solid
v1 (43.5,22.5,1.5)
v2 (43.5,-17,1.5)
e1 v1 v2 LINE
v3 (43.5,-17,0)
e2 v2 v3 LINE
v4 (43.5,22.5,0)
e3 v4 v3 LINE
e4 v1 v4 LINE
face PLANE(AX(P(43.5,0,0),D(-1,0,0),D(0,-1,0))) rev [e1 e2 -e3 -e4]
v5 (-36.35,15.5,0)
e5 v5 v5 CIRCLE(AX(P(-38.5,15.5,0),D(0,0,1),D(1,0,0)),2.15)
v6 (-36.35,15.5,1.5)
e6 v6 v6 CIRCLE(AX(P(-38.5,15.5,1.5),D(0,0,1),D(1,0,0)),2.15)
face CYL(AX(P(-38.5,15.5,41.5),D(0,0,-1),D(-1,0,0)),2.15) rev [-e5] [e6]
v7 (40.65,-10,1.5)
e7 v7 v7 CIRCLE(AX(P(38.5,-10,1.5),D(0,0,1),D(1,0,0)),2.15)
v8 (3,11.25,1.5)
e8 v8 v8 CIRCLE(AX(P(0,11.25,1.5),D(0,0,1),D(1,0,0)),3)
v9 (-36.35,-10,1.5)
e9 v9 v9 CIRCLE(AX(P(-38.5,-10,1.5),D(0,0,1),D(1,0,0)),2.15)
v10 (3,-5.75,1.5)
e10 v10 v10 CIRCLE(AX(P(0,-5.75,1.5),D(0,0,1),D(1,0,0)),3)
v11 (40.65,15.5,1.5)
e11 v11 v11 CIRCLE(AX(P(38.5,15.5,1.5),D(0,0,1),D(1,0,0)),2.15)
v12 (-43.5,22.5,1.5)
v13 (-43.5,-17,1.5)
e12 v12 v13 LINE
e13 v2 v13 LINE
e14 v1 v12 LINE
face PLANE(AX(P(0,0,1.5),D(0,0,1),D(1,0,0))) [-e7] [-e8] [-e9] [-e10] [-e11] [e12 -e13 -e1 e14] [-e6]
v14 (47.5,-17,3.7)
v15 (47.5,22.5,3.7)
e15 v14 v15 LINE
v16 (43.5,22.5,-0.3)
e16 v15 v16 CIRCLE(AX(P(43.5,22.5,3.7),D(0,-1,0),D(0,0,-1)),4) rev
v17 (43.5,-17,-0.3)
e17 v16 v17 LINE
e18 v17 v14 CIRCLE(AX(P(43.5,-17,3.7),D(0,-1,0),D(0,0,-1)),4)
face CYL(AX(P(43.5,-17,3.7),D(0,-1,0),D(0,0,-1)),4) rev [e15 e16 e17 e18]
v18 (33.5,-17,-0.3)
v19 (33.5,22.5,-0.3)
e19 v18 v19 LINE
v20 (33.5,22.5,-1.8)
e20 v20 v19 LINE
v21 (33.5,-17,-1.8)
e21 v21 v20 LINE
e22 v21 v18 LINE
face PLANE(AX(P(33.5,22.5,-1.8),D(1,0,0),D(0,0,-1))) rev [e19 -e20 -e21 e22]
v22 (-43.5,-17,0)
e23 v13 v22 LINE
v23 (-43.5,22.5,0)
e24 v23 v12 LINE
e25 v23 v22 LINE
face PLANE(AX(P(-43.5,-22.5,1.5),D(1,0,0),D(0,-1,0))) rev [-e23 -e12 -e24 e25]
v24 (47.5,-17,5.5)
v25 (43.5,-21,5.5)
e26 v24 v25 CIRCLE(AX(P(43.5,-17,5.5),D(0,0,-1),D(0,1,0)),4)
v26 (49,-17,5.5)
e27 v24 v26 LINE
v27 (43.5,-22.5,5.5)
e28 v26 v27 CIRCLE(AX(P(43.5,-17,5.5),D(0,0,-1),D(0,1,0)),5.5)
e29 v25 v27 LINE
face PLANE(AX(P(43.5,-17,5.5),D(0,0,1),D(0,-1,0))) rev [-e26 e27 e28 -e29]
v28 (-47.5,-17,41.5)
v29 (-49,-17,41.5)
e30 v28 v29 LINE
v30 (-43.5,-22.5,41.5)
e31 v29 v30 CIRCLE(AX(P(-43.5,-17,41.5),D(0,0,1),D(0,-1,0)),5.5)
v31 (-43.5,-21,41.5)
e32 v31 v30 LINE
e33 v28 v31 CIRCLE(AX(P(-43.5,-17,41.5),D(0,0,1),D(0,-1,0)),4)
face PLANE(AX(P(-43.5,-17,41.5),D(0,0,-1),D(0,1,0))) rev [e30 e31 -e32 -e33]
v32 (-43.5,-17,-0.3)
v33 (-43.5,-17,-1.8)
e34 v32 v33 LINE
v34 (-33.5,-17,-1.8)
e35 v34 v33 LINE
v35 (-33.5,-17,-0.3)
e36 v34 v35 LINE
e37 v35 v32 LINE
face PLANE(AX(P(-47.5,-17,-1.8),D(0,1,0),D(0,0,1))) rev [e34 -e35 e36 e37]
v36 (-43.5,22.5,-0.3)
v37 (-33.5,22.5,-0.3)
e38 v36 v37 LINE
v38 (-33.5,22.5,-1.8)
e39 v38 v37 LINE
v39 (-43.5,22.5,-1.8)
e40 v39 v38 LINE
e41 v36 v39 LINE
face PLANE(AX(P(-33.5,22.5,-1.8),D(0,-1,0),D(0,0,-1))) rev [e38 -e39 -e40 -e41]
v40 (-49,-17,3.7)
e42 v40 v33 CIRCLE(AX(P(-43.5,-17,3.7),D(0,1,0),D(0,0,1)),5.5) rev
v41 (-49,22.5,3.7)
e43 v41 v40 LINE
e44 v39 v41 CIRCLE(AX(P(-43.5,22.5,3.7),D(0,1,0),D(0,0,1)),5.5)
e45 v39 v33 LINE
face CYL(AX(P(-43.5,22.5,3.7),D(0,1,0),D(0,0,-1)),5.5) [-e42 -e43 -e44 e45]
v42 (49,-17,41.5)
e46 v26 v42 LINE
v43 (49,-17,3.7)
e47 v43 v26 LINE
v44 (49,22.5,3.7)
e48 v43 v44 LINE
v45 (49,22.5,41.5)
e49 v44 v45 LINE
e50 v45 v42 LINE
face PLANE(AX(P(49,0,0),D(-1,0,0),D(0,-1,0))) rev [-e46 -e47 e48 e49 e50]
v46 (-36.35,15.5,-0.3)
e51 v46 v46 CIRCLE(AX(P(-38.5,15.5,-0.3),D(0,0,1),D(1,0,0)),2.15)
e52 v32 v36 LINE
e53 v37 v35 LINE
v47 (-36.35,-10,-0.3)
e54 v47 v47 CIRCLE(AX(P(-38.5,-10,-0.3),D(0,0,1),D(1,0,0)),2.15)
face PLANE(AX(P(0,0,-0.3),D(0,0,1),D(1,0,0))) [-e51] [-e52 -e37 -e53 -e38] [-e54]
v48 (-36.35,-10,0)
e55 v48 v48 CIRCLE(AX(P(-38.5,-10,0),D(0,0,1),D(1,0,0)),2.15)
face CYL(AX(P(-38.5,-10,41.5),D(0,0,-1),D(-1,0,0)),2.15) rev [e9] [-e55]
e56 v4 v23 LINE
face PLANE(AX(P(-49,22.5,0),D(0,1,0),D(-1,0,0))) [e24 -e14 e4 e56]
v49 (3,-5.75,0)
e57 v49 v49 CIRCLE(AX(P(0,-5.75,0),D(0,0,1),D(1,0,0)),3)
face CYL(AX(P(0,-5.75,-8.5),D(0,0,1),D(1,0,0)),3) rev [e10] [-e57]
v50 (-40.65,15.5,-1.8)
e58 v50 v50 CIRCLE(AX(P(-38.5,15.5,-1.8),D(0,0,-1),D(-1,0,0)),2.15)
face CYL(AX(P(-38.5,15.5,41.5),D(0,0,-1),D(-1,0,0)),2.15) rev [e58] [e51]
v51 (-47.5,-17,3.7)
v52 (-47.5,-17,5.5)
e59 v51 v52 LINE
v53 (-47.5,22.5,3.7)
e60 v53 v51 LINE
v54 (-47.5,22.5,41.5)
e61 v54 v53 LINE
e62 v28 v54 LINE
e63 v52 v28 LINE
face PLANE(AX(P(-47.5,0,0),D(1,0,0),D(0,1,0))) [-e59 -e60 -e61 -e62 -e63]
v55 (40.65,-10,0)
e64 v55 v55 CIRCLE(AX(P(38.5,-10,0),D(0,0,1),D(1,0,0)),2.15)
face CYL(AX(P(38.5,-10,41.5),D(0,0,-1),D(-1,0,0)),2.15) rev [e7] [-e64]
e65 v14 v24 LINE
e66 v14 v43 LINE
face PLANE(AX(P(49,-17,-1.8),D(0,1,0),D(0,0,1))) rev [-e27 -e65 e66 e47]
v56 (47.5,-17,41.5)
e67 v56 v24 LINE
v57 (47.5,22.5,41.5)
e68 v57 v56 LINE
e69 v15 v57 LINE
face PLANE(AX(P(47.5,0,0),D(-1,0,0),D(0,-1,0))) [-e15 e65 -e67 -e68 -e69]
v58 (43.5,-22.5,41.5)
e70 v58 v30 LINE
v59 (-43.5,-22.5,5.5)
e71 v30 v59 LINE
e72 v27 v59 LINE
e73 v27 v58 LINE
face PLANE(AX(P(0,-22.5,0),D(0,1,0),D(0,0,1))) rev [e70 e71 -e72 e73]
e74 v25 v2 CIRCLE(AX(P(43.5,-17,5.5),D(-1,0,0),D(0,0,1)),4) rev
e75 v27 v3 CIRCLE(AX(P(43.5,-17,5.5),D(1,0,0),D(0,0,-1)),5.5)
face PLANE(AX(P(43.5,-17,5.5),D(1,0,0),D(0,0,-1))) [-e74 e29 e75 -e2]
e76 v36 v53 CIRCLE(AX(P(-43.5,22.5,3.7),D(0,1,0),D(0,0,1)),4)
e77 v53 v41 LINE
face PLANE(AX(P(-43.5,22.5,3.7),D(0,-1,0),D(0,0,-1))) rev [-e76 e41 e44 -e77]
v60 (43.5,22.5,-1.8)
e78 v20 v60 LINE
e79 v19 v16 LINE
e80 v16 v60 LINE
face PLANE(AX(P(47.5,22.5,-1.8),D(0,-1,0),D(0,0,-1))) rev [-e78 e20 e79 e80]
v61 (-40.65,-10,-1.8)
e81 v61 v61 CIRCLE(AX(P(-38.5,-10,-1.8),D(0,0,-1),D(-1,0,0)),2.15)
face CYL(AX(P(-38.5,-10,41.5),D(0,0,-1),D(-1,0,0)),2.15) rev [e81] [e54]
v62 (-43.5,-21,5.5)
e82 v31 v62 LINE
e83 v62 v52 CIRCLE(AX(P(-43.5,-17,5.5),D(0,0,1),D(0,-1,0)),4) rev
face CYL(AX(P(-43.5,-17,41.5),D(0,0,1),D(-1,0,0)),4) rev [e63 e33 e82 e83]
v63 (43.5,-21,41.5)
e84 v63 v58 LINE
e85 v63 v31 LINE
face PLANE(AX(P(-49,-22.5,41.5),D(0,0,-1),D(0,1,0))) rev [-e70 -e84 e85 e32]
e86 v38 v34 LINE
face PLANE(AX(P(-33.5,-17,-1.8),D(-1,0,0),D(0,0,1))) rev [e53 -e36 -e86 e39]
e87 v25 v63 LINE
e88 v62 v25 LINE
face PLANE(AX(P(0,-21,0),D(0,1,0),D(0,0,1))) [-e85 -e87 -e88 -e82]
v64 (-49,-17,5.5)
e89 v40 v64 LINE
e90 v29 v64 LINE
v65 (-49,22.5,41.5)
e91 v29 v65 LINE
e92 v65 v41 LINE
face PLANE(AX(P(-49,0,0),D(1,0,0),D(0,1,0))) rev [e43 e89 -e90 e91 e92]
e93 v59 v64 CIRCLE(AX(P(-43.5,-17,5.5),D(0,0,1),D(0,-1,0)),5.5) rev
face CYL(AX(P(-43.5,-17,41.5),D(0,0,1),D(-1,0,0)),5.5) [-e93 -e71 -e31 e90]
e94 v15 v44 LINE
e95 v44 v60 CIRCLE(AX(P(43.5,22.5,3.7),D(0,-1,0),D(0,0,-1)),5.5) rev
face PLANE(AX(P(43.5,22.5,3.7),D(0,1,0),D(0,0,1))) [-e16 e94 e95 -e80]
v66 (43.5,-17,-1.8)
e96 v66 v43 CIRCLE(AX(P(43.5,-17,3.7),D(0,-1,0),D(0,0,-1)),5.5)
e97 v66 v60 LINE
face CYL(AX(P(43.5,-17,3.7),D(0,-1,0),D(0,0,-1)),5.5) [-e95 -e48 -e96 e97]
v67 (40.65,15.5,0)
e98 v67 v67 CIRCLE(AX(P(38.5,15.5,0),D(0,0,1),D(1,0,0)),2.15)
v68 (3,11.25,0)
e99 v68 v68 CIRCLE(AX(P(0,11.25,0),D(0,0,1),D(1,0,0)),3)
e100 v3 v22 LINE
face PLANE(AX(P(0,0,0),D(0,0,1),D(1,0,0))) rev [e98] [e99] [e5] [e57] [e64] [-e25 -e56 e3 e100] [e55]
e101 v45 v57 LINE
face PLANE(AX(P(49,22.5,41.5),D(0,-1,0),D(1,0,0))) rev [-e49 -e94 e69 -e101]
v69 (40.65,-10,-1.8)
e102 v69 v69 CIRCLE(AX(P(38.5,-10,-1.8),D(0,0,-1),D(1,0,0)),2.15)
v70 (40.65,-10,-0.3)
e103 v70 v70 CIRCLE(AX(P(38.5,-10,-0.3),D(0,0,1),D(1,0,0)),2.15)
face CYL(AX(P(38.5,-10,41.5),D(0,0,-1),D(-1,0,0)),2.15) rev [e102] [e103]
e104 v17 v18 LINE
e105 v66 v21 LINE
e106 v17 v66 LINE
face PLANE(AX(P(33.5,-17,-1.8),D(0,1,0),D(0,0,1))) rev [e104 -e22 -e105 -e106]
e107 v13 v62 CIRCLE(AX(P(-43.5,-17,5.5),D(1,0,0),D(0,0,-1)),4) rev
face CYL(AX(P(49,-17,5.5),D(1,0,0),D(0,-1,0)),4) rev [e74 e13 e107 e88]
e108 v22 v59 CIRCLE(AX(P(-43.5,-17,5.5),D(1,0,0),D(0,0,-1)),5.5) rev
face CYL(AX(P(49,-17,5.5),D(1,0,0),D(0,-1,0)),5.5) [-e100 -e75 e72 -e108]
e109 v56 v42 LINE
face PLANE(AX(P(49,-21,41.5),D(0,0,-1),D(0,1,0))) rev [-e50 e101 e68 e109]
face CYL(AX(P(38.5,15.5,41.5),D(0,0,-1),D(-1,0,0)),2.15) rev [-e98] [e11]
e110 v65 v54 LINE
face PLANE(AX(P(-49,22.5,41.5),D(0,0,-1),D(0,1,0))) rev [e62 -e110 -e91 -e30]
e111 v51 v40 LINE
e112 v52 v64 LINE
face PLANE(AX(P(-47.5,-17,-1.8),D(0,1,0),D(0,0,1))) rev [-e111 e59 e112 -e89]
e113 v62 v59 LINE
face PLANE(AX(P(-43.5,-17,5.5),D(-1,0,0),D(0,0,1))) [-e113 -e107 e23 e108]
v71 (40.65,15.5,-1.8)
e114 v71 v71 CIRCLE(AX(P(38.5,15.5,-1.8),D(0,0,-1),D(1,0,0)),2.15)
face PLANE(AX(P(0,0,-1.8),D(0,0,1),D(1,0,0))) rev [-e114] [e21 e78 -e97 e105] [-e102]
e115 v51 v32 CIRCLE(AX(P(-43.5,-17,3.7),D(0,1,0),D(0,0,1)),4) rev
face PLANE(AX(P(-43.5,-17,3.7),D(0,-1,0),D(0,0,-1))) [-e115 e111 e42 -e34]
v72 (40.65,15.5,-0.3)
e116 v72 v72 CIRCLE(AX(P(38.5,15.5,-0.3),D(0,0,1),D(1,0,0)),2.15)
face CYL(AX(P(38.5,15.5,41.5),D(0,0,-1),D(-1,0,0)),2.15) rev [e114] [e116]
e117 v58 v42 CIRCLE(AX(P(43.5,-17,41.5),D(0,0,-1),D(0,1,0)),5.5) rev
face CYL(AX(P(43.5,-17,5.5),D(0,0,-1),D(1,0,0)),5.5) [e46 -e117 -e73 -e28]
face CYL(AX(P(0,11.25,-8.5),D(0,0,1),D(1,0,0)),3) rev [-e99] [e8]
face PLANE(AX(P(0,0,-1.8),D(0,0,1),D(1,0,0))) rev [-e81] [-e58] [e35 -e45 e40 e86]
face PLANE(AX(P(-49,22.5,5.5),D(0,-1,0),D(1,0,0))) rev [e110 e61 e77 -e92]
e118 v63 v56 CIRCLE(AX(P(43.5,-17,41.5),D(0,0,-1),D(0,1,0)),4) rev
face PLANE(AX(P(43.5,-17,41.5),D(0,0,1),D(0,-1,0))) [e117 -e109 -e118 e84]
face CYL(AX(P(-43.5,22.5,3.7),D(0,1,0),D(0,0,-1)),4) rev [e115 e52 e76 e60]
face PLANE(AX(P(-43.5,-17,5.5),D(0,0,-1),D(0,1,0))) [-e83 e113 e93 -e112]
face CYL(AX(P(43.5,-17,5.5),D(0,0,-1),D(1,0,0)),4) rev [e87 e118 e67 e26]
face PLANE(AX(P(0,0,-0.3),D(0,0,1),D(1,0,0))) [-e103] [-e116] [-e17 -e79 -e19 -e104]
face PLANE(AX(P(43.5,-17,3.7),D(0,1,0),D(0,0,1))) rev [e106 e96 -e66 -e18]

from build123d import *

# Parameters (mm, degrees)
SKETCH1_W                      = 98
SKETCH1_H                      = 45
BOSS_EXTRUDE1_DEPTH            = 10
CONVERT_SOLID1_START           = 1.5
CONVERT_SOLID1_OUTLINE_W       = 98
CONVERT_SOLID1_OUTLINE_H       = 45
CONVERT_SOLID1_DEPTH           = 8.5
EDGE_FLANGE1_STRIP_W           = 14
EDGE_FLANGE1_STRIP_H           = 1.5
EDGE_FLANGE1_STRIP_CUT_DEPTH   = 98
EDGE_FLANGE1_DEPTH             = 98
EDGE_FLANGE2_STRIP_W           = 14
EDGE_FLANGE2_STRIP_H           = 1.5
EDGE_FLANGE2_STRIP_CUT_DEPTH   = 36
EDGE_FLANGE2_STRIP_2_W         = 14
EDGE_FLANGE2_STRIP_2_H         = 1.5
EDGE_FLANGE2_STRIP_CUT_2_DEPTH = 36
EDGE_FLANGE2_DEPTH             = 36
EDGE_FLANGE2_BEND_DEPTH        = 36
SKETCH17_W                     = 5.5
SKETCH17_H                     = 5.5
CUT_EXTRUDE1_DEPTH             = 79.41077732
SKETCH18_W                     = 1.5
SKETCH18_H                     = 39.5
BOSS_EXTRUDE2_DEPTH            = 7.3
EDGE_FLANGE3_STRIP_W           = 14
EDGE_FLANGE3_STRIP_H           = 1.5
EDGE_FLANGE3_STRIP_CUT_DEPTH   = 39.5
EDGE_FLANGE3_STRIP_2_W         = 14
EDGE_FLANGE3_STRIP_2_H         = 1.5
EDGE_FLANGE3_STRIP_CUT_2_DEPTH = 39.5
EDGE_FLANGE3_DEPTH             = 39.5
EDGE_FLANGE3_BEND_DEPTH        = 39.5
SKETCH25_R                     = 2.15
CUT_EXTRUDE2_DEPTH             = 70.153018734
SKETCH26_R                     = 3
CUT_EXTRUDE3_DEPTH             = 10


# Read off the part's stored shape, not the designer's step: Convert-Solid1
# Sheet-metal steps are written as plain solids
with BuildPart() as part:
    # Sketch1 → Boss-Extrude1 (new body)
    with BuildSketch(Plane.XY):
        Rectangle(SKETCH1_W, SKETCH1_H)
    extrude(amount=BOSS_EXTRUDE1_DEPTH)

    # Convert-Solid1 outline → Convert-Solid1 (cut)
    with BuildSketch(Plane.XY.offset(CONVERT_SOLID1_START)):
        Rectangle(CONVERT_SOLID1_OUTLINE_W, CONVERT_SOLID1_OUTLINE_H)
    extrude(amount=CONVERT_SOLID1_DEPTH, mode=Mode.SUBTRACT)

    # Edge-Flange1 strip (across the edge) → Edge-Flange1 strip cut (cut)
    with BuildSketch(Plane(origin=(-49, -22.5, 1.5), x_dir=(0, 1, 0), z_dir=(1, 0, 0))):
        with Locations((-1.5, -0.75)):
            Rectangle(EDGE_FLANGE1_STRIP_W, EDGE_FLANGE1_STRIP_H)
    extrude(amount=EDGE_FLANGE1_STRIP_CUT_DEPTH, mode=Mode.SUBTRACT)

    # Edge-Flange1 section (across the edge) → Edge-Flange1 (add)
    with BuildSketch(Plane(origin=(-49, -22.5, 1.5), x_dir=(0, 1, 0), z_dir=(1, 0, 0))):
        with BuildLine():
            Line((0, 4), (0, 40))
            Line((0, 40), (1.5, 40))
            Line((1.5, 40), (1.5, 4))
            ThreePointArc((1.5, 4), (2.671572875, 1.171572875), (5.5, 0))
            Line((5.5, 0), (5.5, -1.5))
            ThreePointArc((5.5, -1.5), (1.610912703, 0.110912703), (0, 4))
        make_face()
    extrude(amount=EDGE_FLANGE1_DEPTH)

    # Edge-Flange2 strip (across the edge) → Edge-Flange2 strip cut (cut)
    with BuildSketch(Plane(origin=(49, -21, 41.5), x_dir=(-1, 0, 0), z_dir=(0, 0, -1))):
        with Locations((-1.5, -0.75)):
            Rectangle(EDGE_FLANGE2_STRIP_W, EDGE_FLANGE2_STRIP_H)
    extrude(amount=EDGE_FLANGE2_STRIP_CUT_DEPTH, mode=Mode.SUBTRACT)

    # Edge-Flange2 strip 2 (across the edge) → Edge-Flange2 strip cut 2 (cut)
    with BuildSketch(Plane(origin=(-49, -21, 5.5), x_dir=(1, 0, 0), z_dir=(0, 0, 1))):
        with Locations((-1.5, -0.75)):
            Rectangle(EDGE_FLANGE2_STRIP_2_W, EDGE_FLANGE2_STRIP_2_H)
    extrude(amount=EDGE_FLANGE2_STRIP_CUT_2_DEPTH, mode=Mode.SUBTRACT)

    # Edge-Flange2 section (across the edge) → Edge-Flange2 (add)
    with BuildSketch(Plane(origin=(49, -21, 41.5), x_dir=(-1, 0, 0), z_dir=(0, 0, -1))):
        with BuildLine():
            Line((0, 4), (0, 43.5))
            Line((0, 43.5), (1.5, 43.5))
            Line((1.5, 43.5), (1.5, 4))
            ThreePointArc((1.5, 4), (2.671572875, 1.171572875), (5.5, 0))
            Line((5.5, 0), (5.5, -1.5))
            ThreePointArc((5.5, -1.5), (1.610912703, 0.110912703), (0, 4))
        make_face()
    extrude(amount=EDGE_FLANGE2_DEPTH)

    # Edge-Flange2 section 2 (across the edge) → Edge-Flange2 bend (add)
    with BuildSketch(Plane(origin=(-49, -21, 5.5), x_dir=(1, 0, 0), z_dir=(0, 0, 1))):
        with BuildLine():
            Line((0, 4), (0, 43.5))
            Line((0, 43.5), (1.5, 43.5))
            Line((1.5, 43.5), (1.5, 4))
            ThreePointArc((1.5, 4), (2.671572875, 1.171572875), (5.5, 0))
            Line((5.5, 0), (5.5, -1.5))
            ThreePointArc((5.5, -1.5), (1.610912703, 0.110912703), (0, 4))
        make_face()
    extrude(amount=EDGE_FLANGE2_BEND_DEPTH)

    # Sketch17 → Cut-Extrude1 (cut, through all)
    with BuildSketch(Plane(origin=(0, 22.5, 0), x_dir=(1, 0, 0), z_dir=(0, 1, 0))):
        with Locations((-46.25, -2.75)):
            Rectangle(SKETCH17_W, SKETCH17_H)
        with Locations((46.25, -2.75)):
            Rectangle(SKETCH17_W, SKETCH17_H)
    extrude(amount=-CUT_EXTRUDE1_DEPTH, mode=Mode.SUBTRACT)

    # Sketch18 → Boss-Extrude2 (add)
    with BuildSketch(Plane(origin=(0, 0, 5.5), x_dir=(-1, 0, 0), z_dir=(0, 0, -1))):
        with Locations((-48.25, 2.75)):
            Rectangle(SKETCH18_W, SKETCH18_H)
        with Locations((48.25, 2.75)):
            Rectangle(SKETCH18_W, SKETCH18_H)
    extrude(amount=BOSS_EXTRUDE2_DEPTH)

    # Edge-Flange3 strip (across the edge) → Edge-Flange3 strip cut (cut)
    with BuildSketch(Plane(origin=(47.5, 22.5, -1.8), x_dir=(0, 0, 1), z_dir=(0, -1, 0))):
        with Locations((-1.5, -0.75)):
            Rectangle(EDGE_FLANGE3_STRIP_W, EDGE_FLANGE3_STRIP_H)
    extrude(amount=EDGE_FLANGE3_STRIP_CUT_DEPTH, mode=Mode.SUBTRACT)

    # Edge-Flange3 strip 2 (across the edge) → Edge-Flange3 strip cut 2 (cut)
    with BuildSketch(Plane(origin=(-47.5, -17, -1.8), x_dir=(0, 0, 1), z_dir=(0, 1, 0))):
        with Locations((-1.5, -0.75)):
            Rectangle(EDGE_FLANGE3_STRIP_2_W, EDGE_FLANGE3_STRIP_2_H)
    extrude(amount=EDGE_FLANGE3_STRIP_CUT_2_DEPTH, mode=Mode.SUBTRACT)

    # Edge-Flange3 section (across the edge) → Edge-Flange3 (add)
    with BuildSketch(Plane(origin=(47.5, 22.5, -1.8), x_dir=(0, 0, 1), z_dir=(0, -1, 0))):
        with BuildLine():
            Line((0, 4), (0, 14))
            Line((0, 14), (1.5, 14))
            Line((1.5, 14), (1.5, 4))
            ThreePointArc((1.5, 4), (2.671572875, 1.171572875), (5.5, 0))
            Line((5.5, 0), (5.5, -1.5))
            ThreePointArc((5.5, -1.5), (1.610912703, 0.110912703), (0, 4))
        make_face()
    extrude(amount=EDGE_FLANGE3_DEPTH)

    # Edge-Flange3 section 2 (across the edge) → Edge-Flange3 bend (add)
    with BuildSketch(Plane(origin=(-47.5, -17, -1.8), x_dir=(0, 0, 1), z_dir=(0, 1, 0))):
        with BuildLine():
            Line((0, 4), (0, 14))
            Line((0, 14), (1.5, 14))
            Line((1.5, 14), (1.5, 4))
            ThreePointArc((1.5, 4), (2.671572875, 1.171572875), (5.5, 0))
            Line((5.5, 0), (5.5, -1.5))
            ThreePointArc((5.5, -1.5), (1.610912703, 0.110912703), (0, 4))
        make_face()
    extrude(amount=EDGE_FLANGE3_BEND_DEPTH)

    # Sketch25 → Cut-Extrude2 (cut, through all)
    with BuildSketch(Plane(origin=(0, 0, -1.8), x_dir=(-1, 0, 0), z_dir=(0, 0, -1))):
        with Locations((38.5, 15.5)):
            Circle(SKETCH25_R)
        with Locations((38.5, -10)):
            Circle(SKETCH25_R)
        with Locations(Location((-38.5, -10, 0), (0, 0, 180))):
            Circle(SKETCH25_R)
        with Locations(Location((-38.5, 15.5, 0), (0, 0, 180))):
            Circle(SKETCH25_R)
    extrude(amount=-CUT_EXTRUDE2_DEPTH, mode=Mode.SUBTRACT)

    # Sketch26 → Cut-Extrude3 (cut)
    with BuildSketch(Plane.XY.offset(1.5)):
        with Locations((0, 11.25)):
            Circle(SKETCH26_R)
        with Locations((0, -5.75)):
            Circle(SKETCH26_R)
    extrude(amount=-CUT_EXTRUDE3_DEPTH, mode=Mode.SUBTRACT)


solid = part.part
